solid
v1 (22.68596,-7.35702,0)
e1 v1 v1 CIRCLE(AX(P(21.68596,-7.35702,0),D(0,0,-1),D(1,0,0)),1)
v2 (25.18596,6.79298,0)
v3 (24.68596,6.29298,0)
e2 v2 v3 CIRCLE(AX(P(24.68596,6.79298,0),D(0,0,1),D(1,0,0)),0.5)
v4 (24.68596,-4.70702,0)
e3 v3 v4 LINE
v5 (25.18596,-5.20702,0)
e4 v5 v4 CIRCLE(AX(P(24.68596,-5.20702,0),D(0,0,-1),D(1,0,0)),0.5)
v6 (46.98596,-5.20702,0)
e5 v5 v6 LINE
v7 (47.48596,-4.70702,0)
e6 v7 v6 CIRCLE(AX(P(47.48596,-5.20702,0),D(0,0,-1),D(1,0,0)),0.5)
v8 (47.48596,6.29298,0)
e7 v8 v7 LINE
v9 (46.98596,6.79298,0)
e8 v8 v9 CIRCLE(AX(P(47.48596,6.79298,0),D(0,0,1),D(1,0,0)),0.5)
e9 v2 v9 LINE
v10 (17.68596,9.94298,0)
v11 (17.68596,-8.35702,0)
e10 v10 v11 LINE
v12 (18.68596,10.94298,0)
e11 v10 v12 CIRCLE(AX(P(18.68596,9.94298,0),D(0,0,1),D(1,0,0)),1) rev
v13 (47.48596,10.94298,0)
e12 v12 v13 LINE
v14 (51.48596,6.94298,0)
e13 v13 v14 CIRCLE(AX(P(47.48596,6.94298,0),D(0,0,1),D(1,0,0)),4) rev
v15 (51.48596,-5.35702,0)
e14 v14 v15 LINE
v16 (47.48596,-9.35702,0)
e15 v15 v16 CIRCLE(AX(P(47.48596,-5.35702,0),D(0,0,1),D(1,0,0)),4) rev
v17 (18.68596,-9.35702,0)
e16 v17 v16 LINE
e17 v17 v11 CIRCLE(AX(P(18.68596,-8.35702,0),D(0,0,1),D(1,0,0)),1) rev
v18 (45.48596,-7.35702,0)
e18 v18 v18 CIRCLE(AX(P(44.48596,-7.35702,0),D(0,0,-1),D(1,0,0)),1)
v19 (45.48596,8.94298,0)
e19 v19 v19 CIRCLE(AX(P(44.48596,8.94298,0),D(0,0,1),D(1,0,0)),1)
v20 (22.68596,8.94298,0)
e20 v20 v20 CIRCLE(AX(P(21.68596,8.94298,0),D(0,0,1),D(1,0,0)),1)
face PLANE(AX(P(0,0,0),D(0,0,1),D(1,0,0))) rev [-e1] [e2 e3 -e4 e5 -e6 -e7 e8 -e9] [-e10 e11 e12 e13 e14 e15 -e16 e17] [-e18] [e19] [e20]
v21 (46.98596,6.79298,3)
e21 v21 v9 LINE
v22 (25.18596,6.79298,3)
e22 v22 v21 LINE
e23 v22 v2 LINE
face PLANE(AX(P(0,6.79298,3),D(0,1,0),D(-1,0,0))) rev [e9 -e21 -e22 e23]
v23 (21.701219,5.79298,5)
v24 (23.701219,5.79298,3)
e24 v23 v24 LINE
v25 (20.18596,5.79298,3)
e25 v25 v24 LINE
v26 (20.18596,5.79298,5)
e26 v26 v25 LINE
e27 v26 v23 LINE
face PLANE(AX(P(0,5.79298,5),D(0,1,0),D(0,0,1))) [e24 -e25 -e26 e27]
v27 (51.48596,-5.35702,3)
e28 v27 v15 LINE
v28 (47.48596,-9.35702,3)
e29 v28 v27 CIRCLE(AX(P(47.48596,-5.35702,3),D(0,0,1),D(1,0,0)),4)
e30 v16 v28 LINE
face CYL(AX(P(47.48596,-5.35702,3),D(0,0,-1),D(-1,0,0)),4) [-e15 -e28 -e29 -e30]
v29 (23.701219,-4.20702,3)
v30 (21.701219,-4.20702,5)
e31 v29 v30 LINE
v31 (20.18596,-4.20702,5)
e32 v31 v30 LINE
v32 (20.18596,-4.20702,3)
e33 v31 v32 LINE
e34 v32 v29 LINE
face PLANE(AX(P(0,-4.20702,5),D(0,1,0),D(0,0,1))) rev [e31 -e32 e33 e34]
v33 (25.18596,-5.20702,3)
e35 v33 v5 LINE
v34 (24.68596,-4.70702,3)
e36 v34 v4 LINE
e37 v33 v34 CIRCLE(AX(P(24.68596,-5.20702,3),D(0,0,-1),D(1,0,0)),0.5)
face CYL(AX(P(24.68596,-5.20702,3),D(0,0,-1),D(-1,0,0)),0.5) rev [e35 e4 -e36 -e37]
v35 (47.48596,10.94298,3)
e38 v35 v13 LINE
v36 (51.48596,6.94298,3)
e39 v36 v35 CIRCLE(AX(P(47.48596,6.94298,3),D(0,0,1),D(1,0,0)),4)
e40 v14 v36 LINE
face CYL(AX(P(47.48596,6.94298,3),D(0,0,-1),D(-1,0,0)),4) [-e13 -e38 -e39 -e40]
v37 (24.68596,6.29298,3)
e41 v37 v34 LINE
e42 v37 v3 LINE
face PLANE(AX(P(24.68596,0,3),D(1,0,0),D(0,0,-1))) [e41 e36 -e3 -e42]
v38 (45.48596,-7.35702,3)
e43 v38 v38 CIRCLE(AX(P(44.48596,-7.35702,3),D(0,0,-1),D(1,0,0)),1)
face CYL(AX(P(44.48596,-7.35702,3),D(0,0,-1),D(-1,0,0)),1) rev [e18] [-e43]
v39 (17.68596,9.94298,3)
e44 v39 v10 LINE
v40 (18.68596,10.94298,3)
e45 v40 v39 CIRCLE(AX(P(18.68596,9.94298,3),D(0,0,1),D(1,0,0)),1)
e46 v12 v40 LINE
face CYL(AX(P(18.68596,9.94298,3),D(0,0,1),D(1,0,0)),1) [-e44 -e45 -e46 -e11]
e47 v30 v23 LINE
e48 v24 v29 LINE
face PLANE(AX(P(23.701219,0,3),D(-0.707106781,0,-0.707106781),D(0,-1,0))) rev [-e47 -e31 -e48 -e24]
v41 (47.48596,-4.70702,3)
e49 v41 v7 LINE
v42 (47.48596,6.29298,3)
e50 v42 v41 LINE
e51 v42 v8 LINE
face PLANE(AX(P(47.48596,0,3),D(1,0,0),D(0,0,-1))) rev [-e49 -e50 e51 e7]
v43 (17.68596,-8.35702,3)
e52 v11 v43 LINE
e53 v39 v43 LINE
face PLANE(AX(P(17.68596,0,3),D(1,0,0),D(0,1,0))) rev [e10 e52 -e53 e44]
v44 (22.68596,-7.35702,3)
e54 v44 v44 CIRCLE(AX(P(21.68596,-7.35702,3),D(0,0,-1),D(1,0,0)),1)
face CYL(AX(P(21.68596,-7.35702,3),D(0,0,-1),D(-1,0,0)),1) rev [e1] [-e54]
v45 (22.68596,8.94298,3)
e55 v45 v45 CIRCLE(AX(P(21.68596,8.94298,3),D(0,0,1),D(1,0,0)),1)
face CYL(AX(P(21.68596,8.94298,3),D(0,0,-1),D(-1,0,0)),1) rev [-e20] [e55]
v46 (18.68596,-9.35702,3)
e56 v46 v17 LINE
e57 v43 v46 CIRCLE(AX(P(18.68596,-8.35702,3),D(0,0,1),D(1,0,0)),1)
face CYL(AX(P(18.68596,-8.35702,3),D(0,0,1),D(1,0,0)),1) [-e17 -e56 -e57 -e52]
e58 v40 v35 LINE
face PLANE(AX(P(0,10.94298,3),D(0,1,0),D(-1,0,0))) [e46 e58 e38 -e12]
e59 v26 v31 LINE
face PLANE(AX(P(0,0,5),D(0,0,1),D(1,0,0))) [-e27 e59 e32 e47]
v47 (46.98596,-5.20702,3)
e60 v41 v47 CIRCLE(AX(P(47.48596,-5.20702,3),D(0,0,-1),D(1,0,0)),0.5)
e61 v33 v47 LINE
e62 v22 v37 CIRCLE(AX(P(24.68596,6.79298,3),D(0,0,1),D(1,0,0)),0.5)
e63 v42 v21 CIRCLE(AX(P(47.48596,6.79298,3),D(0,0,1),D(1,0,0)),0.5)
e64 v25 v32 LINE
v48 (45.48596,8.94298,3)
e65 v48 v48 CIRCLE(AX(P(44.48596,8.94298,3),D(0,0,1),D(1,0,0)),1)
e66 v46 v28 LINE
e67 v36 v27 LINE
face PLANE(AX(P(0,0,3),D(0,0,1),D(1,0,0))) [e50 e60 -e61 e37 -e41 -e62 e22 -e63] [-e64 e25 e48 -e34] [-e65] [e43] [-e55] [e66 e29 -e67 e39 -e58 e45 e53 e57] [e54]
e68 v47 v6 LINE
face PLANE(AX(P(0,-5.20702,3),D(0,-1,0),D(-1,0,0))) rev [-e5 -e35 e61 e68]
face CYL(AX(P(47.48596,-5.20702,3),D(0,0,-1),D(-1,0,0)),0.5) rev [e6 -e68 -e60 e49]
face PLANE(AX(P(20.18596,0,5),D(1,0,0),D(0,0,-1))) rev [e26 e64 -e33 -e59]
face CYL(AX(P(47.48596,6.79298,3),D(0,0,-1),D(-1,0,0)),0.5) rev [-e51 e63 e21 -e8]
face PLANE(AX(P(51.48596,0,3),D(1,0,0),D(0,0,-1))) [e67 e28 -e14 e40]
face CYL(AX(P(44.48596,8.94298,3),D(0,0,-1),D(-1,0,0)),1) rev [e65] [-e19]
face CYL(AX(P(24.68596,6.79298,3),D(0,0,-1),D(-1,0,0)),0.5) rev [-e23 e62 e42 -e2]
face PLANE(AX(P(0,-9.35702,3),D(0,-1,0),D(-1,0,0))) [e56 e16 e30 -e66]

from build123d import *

# Parameters (mm, degrees)
SKETCH2_R           = 1
BOSS_EXTRUDE1_DEPTH = 3
SKETCH3_W           = 3.515258844
SKETCH3_H           = 10
BOSS_EXTRUDE2_DEPTH = 2
CHAMFER1_SIZE       = 2
FILLET1_R           = 4
FILLET2_R           = 1


with BuildPart() as part:
    # Sketch2 → Boss-Extrude1 (new body)
    with BuildSketch(Plane.XY):
        with BuildLine():
            Line((47.48595993, 0.792979965), (51.48595993, 0.792979965))
            Line((51.48595993, 0.792979965), (51.48595993, 10.942979965))
            Line((51.48595993, 10.942979965), (17.68595993, 10.942979965))
            Line((17.68595993, 10.942979965), (17.68595993, 0.792979965))
            Line((17.68595993, 0.792979965), (24.68595993, 0.792979965))
            Line((24.68595993, 0.792979965), (24.68595993, 6.292979965))
            ThreePointArc((24.68595993, 6.292979965), (24.33240654, 7.146533356), (25.18595993, 6.792979965))
            Line((25.18595993, 6.792979965), (46.98595993, 6.792979965))
            ThreePointArc((46.98595993, 6.792979965), (47.839513321, 7.146533356), (47.48595993, 6.292979965))
            Line((47.48595993, 6.292979965), (47.48595993, 0.792979965))
        make_face()
        with Locations((44.48595993, 8.942979965)):
            Circle(SKETCH2_R, mode=Mode.SUBTRACT)
        with Locations((21.68595993, 8.942979965)):
            Circle(SKETCH2_R, mode=Mode.SUBTRACT)
    extrude(amount=BOSS_EXTRUDE1_DEPTH)

    # Mirror1: part across plane


with BuildPart() as part_1:
    add(part.part)
    add(part.part.mirror(Plane(origin=(0, 0.792979965, 3), x_dir=(0, 0, 1), z_dir=(0, -1, 0))))

    # Sketch3 → Boss-Extrude2 (add)
    with BuildSketch(Plane.XY.offset(3)):
        with Locations((21.943589352, 0.792979965)):
            Rectangle(SKETCH3_W, SKETCH3_H)
    extrude(amount=BOSS_EXTRUDE2_DEPTH)

    # Chamfer1
    chamfer1_edges = [part_1.edges().sort_by_distance(p)[0] for p in [
        (23.701218774, 0.792979965, 5),
    ]]
    chamfer(chamfer1_edges, length=CHAMFER1_SIZE - 0.0001)  # a hair under: the kernel refuses the full size

    # Fillet1
    fillet1_edges = [part_1.edges().sort_by_distance(p)[0] for p in [
        (51.48595993, 10.942979965, 1.5),
        (51.48595993, -9.357020035, 1.5),
    ]]
    fillet(fillet1_edges, radius=FILLET1_R)

    # Fillet2
    fillet2_edges = [part_1.edges().sort_by_distance(p)[0] for p in [
        (17.68595993, 10.942979965, 1.5),
        (17.68595993, -9.357020035, 1.5),
    ]]
    fillet(fillet2_edges, radius=FILLET2_R)


solid = part_1.part
